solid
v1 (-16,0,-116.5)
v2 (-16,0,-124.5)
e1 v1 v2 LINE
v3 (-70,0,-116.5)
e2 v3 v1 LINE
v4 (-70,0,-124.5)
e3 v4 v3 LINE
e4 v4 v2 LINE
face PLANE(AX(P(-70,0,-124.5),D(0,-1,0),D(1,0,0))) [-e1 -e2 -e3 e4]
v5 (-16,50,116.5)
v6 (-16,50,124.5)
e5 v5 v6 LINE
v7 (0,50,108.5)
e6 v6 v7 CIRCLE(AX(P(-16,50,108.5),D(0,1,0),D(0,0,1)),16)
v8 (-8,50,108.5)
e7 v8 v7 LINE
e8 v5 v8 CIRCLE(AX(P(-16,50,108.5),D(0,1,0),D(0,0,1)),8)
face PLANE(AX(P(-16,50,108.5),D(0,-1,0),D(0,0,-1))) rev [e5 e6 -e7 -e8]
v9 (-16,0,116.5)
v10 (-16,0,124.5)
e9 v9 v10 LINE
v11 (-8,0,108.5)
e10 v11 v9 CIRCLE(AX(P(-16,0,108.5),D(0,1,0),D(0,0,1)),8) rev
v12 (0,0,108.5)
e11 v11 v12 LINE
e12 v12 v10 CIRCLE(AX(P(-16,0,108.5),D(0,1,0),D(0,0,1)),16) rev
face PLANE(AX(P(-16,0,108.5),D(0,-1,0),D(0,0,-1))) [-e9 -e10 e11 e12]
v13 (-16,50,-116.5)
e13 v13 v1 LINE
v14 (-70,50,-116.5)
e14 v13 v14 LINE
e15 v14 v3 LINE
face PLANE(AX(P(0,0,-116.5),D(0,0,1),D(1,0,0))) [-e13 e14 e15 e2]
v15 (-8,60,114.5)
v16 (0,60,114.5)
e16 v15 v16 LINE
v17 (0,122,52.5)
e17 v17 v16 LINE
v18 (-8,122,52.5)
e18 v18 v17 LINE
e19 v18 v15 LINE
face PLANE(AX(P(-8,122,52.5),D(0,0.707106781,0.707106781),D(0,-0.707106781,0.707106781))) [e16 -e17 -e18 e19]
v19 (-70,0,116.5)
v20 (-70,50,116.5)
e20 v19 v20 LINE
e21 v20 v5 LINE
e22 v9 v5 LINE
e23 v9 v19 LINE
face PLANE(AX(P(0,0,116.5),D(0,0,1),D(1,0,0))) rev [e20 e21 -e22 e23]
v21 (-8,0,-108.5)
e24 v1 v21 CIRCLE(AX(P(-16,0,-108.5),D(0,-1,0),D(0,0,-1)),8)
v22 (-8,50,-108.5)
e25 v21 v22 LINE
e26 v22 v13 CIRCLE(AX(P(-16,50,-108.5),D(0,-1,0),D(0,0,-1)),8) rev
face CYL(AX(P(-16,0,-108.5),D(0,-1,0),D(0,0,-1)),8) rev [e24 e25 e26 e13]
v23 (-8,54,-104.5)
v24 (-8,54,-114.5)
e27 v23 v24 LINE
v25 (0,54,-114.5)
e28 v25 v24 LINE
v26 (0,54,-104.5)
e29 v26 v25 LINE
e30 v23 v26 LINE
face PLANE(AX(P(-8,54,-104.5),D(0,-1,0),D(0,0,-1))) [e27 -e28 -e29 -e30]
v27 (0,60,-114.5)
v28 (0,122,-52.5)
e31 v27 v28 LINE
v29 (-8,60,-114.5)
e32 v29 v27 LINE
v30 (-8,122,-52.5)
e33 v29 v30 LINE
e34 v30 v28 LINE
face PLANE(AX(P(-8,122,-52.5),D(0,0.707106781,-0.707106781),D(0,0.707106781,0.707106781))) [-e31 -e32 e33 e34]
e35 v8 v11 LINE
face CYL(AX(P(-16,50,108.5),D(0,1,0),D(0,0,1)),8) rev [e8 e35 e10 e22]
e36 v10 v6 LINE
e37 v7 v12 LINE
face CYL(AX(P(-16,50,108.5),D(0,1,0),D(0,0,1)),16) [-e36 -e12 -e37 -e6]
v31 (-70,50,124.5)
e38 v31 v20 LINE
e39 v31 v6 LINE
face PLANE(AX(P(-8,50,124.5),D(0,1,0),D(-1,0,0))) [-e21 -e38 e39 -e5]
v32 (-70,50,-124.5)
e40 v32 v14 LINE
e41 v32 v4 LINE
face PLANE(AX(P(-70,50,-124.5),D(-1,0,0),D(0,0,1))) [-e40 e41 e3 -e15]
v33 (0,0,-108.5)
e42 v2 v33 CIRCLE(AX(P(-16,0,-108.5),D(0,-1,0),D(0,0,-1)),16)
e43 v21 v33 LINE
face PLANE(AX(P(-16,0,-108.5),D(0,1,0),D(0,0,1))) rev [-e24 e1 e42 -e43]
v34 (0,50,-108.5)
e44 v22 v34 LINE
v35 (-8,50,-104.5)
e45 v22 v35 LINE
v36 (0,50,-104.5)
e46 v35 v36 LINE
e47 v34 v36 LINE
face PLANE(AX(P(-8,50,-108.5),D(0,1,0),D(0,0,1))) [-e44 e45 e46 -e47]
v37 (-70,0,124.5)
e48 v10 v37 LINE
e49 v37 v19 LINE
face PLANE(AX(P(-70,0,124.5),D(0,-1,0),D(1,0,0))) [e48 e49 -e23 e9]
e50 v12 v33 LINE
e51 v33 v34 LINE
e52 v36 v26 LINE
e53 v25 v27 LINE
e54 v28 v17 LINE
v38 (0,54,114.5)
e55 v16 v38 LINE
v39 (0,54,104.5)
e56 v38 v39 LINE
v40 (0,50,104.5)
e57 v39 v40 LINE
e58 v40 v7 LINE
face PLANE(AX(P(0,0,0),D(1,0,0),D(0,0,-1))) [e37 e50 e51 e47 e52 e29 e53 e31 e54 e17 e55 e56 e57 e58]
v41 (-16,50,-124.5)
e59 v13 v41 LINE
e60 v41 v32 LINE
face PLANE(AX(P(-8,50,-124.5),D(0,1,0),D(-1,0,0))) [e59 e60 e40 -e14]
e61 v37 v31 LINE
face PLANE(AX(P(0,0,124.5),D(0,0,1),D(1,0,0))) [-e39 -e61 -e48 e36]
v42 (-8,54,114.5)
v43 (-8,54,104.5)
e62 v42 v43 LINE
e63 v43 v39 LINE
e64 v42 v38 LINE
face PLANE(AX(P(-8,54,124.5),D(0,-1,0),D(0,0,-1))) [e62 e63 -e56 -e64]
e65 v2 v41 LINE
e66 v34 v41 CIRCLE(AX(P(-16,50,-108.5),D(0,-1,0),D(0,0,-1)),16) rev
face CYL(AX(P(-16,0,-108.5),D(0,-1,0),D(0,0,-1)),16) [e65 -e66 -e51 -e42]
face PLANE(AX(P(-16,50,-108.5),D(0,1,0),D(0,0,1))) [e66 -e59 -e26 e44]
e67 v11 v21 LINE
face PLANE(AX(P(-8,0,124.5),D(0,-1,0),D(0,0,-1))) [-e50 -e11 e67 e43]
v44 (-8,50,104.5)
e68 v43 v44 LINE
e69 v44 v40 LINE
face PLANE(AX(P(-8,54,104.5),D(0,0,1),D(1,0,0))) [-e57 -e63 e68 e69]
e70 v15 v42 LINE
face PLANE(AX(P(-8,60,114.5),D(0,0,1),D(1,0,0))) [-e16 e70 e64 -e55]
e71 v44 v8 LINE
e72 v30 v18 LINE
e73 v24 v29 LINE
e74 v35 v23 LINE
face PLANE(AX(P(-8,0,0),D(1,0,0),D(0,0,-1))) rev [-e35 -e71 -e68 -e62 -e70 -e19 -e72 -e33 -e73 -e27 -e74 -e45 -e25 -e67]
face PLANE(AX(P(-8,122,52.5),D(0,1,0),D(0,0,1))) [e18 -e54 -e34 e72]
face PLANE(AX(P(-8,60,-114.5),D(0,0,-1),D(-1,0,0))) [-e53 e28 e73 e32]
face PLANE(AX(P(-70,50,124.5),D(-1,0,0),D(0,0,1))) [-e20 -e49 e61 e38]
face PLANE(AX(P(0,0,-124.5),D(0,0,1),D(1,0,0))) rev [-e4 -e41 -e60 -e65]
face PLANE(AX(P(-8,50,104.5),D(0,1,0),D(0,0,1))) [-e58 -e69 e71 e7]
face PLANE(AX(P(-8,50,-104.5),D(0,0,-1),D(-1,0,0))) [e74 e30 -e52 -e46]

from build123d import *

# Parameters (mm, degrees)
SM_BASE_FLANGE_1_DEPTH              = 8
SM_EDGE_FLANGE_1_STRIP_W            = 48
SM_EDGE_FLANGE_1_STRIP_H            = 8
SM_EDGE_FLANGE_1_STRIP_CUT_DEPTH    = 50
SM_EDGE_FLANGE_1_RELIEF_W           = 52
SM_EDGE_FLANGE_1_RELIEF_H           = 4
SM_EDGE_FLANGE_1_RELIEF_CUT_DEPTH   = 8
SM_EDGE_FLANGE_1_STRIP_2_W          = 48
SM_EDGE_FLANGE_1_STRIP_2_H          = 8
SM_EDGE_FLANGE_1_STRIP_CUT_2_DEPTH  = 50
SM_EDGE_FLANGE_1_RELIEF_2_W         = 52
SM_EDGE_FLANGE_1_RELIEF_2_H         = 4
SM_EDGE_FLANGE_1_RELIEF_CUT_2_DEPTH = 8
SM_EDGE_FLANGE_1_DEPTH              = 50
SM_EDGE_FLANGE_1_BEND_DEPTH         = 50


# Sheet-metal steps are written as plain solids
with BuildPart() as part:
    # Sketch 1 → 基体-法兰1 (new body)
    with BuildSketch(Plane(origin=(0, 0, 0), x_dir=(0, 0, -1), z_dir=(1, 0, 0))):
        Polygon((-52.5, 122), (52.5, 122), (114.5, 60), (114.5, 50), (124.5, 50), (124.5, 0), (-124.5, 0), (-124.5, 50), (-114.5, 50), (-114.5, 60), align=None)
    extrude(amount=-SM_BASE_FLANGE_1_DEPTH)

    # 边线-法兰1 strip (across the edge) → 边线-法兰1 strip cut (cut)
    with BuildSketch(Plane(origin=(-8, 0, 124.5), x_dir=(0, 0, -1), z_dir=(0, 1, 0))):
        with Locations((-8, -4)):
            Rectangle(SM_EDGE_FLANGE_1_STRIP_W, SM_EDGE_FLANGE_1_STRIP_H)
    extrude(amount=SM_EDGE_FLANGE_1_STRIP_CUT_DEPTH, mode=Mode.SUBTRACT)

    # 边线-法兰1 relief (on the sheet) → 边线-法兰1 relief cut (cut)
    with BuildSketch(Plane(origin=(-8, 0, 108.5), x_dir=(0, 0, -1), z_dir=(-1, 0, 0))):
        with Locations((-22, -52)):
            Rectangle(SM_EDGE_FLANGE_1_RELIEF_W, SM_EDGE_FLANGE_1_RELIEF_H)
    extrude(amount=-SM_EDGE_FLANGE_1_RELIEF_CUT_DEPTH, mode=Mode.SUBTRACT)

    # 边线-法兰1 strip 2 (across the edge) → 边线-法兰1 strip cut 2 (cut)
    with BuildSketch(Plane(origin=(-8, 50, -124.5), x_dir=(0, 0, 1), z_dir=(0, -1, 0))):
        with Locations((-8, -4)):
            Rectangle(SM_EDGE_FLANGE_1_STRIP_2_W, SM_EDGE_FLANGE_1_STRIP_2_H)
    extrude(amount=SM_EDGE_FLANGE_1_STRIP_CUT_2_DEPTH, mode=Mode.SUBTRACT)

    # 边线-法兰1 relief 2 (on the sheet) → 边线-法兰1 relief cut 2 (cut)
    with BuildSketch(Plane(origin=(-8, 50, -108.5), x_dir=(0, 0, 1), z_dir=(-1, 0, 0))):
        with Locations((-22, 2)):
            Rectangle(SM_EDGE_FLANGE_1_RELIEF_2_W, SM_EDGE_FLANGE_1_RELIEF_2_H)
    extrude(amount=-SM_EDGE_FLANGE_1_RELIEF_CUT_2_DEPTH, mode=Mode.SUBTRACT)

    # 边线-法兰1 section (across the edge) → 边线-法兰1 (add)
    with BuildSketch(Plane(origin=(-8, 0, 124.5), x_dir=(0, 0, -1), z_dir=(0, 1, 0))):
        with BuildLine():
            Line((0, 8), (0, 62))
            Line((0, 62), (8, 62))
            Line((8, 62), (8, 8))
            ThreePointArc((8, 8), (10.343145751, 2.343145751), (16, 0))
            Line((16, 0), (16, -8))
            ThreePointArc((16, -8), (4.686291501, -3.313708499), (0, 8))
        make_face()
    extrude(amount=SM_EDGE_FLANGE_1_DEPTH)

    # 边线-法兰1 section 2 (across the edge) → 边线-法兰1 bend (add)
    with BuildSketch(Plane(origin=(-8, 50, -124.5), x_dir=(0, 0, 1), z_dir=(0, -1, 0))):
        with BuildLine():
            Line((0, 8), (0, 62))
            Line((0, 62), (8, 62))
            Line((8, 62), (8, 8))
            ThreePointArc((8, 8), (10.343145751, 2.343145751), (16, 0))
            Line((16, 0), (16, -8))
            ThreePointArc((16, -8), (4.686291501, -3.313708499), (0, 8))
        make_face()
    extrude(amount=SM_EDGE_FLANGE_1_BEND_DEPTH)


solid = part.part
